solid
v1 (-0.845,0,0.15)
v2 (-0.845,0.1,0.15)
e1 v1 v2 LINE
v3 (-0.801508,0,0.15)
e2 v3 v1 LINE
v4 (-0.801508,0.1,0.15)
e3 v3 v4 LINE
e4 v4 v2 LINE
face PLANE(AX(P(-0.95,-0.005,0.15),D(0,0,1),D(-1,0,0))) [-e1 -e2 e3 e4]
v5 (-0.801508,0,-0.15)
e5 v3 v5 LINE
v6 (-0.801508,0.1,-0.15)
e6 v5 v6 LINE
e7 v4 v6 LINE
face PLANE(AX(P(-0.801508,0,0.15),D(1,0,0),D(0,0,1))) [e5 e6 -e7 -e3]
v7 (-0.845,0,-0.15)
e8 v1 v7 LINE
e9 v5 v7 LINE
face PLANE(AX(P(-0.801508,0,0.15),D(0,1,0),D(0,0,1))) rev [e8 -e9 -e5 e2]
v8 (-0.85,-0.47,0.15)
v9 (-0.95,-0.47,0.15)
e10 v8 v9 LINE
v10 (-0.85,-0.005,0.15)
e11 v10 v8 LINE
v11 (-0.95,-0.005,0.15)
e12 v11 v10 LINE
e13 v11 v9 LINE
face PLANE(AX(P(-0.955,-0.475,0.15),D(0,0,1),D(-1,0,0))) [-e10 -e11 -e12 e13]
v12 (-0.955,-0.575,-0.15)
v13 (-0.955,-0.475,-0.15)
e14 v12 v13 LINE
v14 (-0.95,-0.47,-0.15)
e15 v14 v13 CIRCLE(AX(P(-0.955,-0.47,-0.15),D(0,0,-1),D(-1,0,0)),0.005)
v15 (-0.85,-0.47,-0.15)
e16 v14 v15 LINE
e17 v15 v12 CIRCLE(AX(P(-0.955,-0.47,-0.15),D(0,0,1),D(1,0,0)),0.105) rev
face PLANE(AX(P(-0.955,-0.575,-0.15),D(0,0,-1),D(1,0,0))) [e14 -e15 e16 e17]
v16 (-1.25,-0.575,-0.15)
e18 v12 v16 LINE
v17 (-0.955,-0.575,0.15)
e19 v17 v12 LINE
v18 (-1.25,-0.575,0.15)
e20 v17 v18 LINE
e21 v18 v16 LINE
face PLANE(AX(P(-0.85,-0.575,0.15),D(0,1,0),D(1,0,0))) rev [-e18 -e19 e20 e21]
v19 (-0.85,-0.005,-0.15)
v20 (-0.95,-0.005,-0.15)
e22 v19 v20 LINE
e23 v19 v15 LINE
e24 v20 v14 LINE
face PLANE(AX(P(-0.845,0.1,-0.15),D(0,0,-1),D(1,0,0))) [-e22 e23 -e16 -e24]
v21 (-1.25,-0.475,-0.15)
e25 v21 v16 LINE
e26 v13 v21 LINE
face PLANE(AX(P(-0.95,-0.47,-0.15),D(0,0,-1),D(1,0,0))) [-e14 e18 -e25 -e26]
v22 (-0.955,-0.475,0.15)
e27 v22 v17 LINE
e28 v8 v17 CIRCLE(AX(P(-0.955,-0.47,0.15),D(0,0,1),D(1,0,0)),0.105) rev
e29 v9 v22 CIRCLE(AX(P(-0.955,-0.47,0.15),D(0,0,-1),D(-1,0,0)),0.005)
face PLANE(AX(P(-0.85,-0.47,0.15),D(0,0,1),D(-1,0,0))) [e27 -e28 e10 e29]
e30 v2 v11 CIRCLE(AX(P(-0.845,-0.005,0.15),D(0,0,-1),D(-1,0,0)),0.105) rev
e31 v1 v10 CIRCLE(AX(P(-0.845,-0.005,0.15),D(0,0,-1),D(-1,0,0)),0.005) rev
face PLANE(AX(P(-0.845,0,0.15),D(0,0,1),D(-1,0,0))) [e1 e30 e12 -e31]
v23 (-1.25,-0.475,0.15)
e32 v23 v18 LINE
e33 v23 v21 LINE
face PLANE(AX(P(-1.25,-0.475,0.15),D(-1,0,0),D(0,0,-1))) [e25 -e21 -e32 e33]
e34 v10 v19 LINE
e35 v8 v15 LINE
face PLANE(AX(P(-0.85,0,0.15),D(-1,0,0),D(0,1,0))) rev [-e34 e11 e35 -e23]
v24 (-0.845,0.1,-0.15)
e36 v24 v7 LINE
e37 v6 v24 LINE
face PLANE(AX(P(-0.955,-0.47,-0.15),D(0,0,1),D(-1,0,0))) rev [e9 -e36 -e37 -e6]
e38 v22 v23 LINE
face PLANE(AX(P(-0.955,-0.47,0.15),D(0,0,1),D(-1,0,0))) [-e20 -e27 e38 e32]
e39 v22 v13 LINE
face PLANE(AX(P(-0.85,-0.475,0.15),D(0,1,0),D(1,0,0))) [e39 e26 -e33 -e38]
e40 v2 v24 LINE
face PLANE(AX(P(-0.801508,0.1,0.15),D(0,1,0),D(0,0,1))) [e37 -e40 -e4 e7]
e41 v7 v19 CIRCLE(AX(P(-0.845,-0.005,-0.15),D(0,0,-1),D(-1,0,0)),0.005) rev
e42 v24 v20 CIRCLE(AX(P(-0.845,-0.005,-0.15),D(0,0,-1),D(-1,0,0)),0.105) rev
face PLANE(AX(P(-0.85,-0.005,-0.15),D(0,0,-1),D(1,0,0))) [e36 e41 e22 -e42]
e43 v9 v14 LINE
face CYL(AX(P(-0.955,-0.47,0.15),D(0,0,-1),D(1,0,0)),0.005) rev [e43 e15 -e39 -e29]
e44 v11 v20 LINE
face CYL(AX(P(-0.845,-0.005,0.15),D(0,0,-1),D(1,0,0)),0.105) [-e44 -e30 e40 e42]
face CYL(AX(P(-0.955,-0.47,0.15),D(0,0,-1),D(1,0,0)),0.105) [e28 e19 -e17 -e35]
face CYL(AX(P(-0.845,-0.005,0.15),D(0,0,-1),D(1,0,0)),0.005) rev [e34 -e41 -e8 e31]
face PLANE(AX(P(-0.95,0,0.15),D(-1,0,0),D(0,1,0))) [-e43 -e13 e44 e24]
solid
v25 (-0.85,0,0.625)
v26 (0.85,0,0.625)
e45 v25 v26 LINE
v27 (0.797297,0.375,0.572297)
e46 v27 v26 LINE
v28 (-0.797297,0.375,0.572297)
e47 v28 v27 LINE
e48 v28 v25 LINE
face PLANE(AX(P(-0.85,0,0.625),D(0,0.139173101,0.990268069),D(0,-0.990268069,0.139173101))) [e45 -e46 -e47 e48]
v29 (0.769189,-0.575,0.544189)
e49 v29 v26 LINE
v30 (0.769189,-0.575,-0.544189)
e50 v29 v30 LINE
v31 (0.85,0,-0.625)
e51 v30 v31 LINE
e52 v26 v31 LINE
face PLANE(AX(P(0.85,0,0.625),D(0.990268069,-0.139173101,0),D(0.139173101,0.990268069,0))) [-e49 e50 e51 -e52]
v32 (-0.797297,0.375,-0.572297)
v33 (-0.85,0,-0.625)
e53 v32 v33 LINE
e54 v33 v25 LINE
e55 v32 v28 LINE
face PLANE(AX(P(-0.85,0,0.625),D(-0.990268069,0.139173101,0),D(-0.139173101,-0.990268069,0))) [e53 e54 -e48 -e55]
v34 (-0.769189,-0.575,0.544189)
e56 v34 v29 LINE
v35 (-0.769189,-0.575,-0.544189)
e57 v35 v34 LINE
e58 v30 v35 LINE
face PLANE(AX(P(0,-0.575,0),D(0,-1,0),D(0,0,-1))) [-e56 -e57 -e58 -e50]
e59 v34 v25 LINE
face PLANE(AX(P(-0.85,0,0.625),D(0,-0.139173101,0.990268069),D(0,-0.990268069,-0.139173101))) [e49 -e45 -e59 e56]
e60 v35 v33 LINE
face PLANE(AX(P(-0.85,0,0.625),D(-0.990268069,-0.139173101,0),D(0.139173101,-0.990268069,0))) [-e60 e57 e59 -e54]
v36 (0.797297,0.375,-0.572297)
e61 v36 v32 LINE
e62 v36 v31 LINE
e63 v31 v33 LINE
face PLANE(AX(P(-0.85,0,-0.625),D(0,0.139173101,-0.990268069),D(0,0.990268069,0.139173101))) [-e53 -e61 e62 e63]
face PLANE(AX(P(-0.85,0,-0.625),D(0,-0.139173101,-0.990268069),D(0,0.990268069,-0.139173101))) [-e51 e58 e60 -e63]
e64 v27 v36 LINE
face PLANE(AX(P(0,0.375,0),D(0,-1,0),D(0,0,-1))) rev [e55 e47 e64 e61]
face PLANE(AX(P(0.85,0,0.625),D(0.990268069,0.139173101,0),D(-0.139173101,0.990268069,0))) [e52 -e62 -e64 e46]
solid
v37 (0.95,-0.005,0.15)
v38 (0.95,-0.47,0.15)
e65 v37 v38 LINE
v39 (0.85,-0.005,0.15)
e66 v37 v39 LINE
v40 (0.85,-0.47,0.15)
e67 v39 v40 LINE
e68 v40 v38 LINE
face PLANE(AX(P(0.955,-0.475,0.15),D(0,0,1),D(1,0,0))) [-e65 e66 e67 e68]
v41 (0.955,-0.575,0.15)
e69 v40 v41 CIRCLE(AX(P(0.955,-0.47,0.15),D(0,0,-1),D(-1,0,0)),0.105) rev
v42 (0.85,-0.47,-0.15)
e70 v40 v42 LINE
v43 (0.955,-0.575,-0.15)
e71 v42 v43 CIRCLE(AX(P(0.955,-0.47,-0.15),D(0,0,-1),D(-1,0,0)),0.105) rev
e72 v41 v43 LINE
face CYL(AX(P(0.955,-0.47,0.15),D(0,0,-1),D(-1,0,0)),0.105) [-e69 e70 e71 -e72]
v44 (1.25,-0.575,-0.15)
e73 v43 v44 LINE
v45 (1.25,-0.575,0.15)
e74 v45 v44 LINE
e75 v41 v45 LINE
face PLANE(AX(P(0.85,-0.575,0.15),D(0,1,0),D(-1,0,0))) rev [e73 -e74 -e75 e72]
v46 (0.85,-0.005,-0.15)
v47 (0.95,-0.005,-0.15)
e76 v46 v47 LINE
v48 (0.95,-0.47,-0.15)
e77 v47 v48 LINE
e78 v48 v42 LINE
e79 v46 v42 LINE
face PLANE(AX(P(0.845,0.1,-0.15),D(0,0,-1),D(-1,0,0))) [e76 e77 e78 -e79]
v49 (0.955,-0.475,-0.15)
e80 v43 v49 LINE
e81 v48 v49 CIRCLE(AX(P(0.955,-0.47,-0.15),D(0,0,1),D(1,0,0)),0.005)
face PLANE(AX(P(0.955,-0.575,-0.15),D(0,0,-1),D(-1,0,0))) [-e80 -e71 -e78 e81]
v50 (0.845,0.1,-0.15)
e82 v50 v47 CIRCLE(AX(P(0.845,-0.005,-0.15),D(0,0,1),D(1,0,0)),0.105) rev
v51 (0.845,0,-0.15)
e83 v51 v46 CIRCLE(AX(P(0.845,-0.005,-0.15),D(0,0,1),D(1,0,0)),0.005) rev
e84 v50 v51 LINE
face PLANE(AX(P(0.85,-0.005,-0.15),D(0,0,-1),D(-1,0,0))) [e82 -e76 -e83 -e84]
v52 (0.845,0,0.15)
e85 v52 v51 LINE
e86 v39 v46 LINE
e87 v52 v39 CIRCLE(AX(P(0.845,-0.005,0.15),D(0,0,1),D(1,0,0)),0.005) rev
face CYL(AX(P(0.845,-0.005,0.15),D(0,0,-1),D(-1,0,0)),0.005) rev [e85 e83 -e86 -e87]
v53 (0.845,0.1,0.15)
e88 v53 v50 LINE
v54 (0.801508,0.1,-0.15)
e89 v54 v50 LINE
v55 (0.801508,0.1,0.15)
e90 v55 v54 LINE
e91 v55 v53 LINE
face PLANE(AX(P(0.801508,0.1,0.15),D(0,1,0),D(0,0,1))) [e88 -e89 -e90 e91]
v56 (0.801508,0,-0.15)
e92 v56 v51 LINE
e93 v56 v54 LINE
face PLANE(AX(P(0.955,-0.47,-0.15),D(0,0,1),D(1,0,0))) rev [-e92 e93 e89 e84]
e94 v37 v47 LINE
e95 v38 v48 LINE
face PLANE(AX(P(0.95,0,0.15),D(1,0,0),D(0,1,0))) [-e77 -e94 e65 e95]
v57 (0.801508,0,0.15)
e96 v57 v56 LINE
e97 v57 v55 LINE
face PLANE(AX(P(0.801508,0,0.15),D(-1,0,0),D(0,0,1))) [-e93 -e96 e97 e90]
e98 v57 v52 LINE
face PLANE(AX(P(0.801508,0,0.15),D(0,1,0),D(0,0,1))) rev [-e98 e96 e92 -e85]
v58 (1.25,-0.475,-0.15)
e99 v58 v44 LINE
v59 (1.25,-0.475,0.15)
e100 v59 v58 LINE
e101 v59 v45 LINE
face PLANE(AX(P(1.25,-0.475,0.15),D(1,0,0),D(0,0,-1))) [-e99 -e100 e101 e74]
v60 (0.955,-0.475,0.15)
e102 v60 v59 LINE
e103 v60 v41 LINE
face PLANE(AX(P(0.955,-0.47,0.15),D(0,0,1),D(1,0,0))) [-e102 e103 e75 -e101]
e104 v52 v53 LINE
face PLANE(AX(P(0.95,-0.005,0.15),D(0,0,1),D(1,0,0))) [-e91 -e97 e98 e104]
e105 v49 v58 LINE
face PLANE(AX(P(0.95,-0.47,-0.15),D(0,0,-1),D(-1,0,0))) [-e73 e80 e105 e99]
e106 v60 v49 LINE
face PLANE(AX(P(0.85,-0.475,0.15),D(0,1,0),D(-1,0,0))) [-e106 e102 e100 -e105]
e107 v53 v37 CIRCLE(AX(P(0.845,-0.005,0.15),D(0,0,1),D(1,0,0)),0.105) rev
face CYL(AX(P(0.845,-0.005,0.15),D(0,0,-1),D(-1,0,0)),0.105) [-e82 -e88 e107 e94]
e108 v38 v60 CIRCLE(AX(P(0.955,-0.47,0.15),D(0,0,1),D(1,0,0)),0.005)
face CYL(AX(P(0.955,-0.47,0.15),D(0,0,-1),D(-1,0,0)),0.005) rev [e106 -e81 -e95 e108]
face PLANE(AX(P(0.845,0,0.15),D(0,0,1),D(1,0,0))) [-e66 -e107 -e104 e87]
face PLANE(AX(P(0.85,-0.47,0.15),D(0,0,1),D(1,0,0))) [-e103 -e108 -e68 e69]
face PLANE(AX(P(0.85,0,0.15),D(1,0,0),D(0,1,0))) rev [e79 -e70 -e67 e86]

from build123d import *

# Parameters (mm, degrees)
SKETCH1_W                     = 1.7
SKETCH1_H                     = 1.25
BOSS_EXTRUDE1_DEPTH           = 0.375
BOSS_EXTRUDE1_TAPER           = 8
BOSS_EXTRUDE1_OTHER_WAY_DEPTH = 0.575
BOSS_EXTRUDE1_OTHER_WAY_TAPER = 8
BASE_FLANGE1_DEPTH            = 0.15


# Sheet-metal steps are written as plain solids
with BuildPart() as part:
    # Sketch1 → Boss-Extrude1 (new body)
    with BuildSketch(Plane(origin=(0, 0, 0), x_dir=(1, 0, 0), z_dir=(0, 1, 0))):
        Rectangle(SKETCH1_W, SKETCH1_H)
    extrude(amount=BOSS_EXTRUDE1_DEPTH, taper=BOSS_EXTRUDE1_TAPER)

    # Sketch1 → Boss-Extrude1 other way (add)
    with BuildSketch(Plane(origin=(0, 0, 0), x_dir=(1, 0, 0), z_dir=(0, 1, 0))):
        Rectangle(SKETCH1_W, SKETCH1_H)
    extrude(amount=-BOSS_EXTRUDE1_OTHER_WAY_DEPTH, taper=BOSS_EXTRUDE1_OTHER_WAY_TAPER)


with BuildPart() as body_2:
    # Sketch2 → Base-Flange1 (new, symmetric)
    with BuildSketch(Plane.XY):
        with BuildLine():
            Line((0.801508234, 0), (0.845, 0))
            ThreePointArc((0.845, 0), (0.848535534, -0.001464466), (0.85, -0.005))
            Line((0.85, -0.005), (0.85, -0.47))
            ThreePointArc((0.85, -0.47), (0.880753788, -0.544246212), (0.955, -0.575))
            Line((0.955, -0.575), (1.25, -0.575))
            Line((1.25, -0.575), (1.25, -0.475))
            Line((1.25, -0.475), (0.955, -0.475))
            ThreePointArc((0.955, -0.475), (0.951464466, -0.473535534), (0.95, -0.47))
            Line((0.95, -0.47), (0.95, -0.005))
            ThreePointArc((0.95, -0.005), (0.919246212, 0.069246212), (0.845, 0.1))
            Line((0.845, 0.1), (0.801508234, 0.1))
            Line((0.801508234, 0.1), (0.801508234, 0))
        make_face()
    extrude(amount=BASE_FLANGE1_DEPTH, both=True)


with BuildPart() as body_3:
    # Mirror1: mirrored copy
    add(body_2.part.mirror(Plane.ZY))


solid = Compound([part.part, body_2.part, body_3.part])
